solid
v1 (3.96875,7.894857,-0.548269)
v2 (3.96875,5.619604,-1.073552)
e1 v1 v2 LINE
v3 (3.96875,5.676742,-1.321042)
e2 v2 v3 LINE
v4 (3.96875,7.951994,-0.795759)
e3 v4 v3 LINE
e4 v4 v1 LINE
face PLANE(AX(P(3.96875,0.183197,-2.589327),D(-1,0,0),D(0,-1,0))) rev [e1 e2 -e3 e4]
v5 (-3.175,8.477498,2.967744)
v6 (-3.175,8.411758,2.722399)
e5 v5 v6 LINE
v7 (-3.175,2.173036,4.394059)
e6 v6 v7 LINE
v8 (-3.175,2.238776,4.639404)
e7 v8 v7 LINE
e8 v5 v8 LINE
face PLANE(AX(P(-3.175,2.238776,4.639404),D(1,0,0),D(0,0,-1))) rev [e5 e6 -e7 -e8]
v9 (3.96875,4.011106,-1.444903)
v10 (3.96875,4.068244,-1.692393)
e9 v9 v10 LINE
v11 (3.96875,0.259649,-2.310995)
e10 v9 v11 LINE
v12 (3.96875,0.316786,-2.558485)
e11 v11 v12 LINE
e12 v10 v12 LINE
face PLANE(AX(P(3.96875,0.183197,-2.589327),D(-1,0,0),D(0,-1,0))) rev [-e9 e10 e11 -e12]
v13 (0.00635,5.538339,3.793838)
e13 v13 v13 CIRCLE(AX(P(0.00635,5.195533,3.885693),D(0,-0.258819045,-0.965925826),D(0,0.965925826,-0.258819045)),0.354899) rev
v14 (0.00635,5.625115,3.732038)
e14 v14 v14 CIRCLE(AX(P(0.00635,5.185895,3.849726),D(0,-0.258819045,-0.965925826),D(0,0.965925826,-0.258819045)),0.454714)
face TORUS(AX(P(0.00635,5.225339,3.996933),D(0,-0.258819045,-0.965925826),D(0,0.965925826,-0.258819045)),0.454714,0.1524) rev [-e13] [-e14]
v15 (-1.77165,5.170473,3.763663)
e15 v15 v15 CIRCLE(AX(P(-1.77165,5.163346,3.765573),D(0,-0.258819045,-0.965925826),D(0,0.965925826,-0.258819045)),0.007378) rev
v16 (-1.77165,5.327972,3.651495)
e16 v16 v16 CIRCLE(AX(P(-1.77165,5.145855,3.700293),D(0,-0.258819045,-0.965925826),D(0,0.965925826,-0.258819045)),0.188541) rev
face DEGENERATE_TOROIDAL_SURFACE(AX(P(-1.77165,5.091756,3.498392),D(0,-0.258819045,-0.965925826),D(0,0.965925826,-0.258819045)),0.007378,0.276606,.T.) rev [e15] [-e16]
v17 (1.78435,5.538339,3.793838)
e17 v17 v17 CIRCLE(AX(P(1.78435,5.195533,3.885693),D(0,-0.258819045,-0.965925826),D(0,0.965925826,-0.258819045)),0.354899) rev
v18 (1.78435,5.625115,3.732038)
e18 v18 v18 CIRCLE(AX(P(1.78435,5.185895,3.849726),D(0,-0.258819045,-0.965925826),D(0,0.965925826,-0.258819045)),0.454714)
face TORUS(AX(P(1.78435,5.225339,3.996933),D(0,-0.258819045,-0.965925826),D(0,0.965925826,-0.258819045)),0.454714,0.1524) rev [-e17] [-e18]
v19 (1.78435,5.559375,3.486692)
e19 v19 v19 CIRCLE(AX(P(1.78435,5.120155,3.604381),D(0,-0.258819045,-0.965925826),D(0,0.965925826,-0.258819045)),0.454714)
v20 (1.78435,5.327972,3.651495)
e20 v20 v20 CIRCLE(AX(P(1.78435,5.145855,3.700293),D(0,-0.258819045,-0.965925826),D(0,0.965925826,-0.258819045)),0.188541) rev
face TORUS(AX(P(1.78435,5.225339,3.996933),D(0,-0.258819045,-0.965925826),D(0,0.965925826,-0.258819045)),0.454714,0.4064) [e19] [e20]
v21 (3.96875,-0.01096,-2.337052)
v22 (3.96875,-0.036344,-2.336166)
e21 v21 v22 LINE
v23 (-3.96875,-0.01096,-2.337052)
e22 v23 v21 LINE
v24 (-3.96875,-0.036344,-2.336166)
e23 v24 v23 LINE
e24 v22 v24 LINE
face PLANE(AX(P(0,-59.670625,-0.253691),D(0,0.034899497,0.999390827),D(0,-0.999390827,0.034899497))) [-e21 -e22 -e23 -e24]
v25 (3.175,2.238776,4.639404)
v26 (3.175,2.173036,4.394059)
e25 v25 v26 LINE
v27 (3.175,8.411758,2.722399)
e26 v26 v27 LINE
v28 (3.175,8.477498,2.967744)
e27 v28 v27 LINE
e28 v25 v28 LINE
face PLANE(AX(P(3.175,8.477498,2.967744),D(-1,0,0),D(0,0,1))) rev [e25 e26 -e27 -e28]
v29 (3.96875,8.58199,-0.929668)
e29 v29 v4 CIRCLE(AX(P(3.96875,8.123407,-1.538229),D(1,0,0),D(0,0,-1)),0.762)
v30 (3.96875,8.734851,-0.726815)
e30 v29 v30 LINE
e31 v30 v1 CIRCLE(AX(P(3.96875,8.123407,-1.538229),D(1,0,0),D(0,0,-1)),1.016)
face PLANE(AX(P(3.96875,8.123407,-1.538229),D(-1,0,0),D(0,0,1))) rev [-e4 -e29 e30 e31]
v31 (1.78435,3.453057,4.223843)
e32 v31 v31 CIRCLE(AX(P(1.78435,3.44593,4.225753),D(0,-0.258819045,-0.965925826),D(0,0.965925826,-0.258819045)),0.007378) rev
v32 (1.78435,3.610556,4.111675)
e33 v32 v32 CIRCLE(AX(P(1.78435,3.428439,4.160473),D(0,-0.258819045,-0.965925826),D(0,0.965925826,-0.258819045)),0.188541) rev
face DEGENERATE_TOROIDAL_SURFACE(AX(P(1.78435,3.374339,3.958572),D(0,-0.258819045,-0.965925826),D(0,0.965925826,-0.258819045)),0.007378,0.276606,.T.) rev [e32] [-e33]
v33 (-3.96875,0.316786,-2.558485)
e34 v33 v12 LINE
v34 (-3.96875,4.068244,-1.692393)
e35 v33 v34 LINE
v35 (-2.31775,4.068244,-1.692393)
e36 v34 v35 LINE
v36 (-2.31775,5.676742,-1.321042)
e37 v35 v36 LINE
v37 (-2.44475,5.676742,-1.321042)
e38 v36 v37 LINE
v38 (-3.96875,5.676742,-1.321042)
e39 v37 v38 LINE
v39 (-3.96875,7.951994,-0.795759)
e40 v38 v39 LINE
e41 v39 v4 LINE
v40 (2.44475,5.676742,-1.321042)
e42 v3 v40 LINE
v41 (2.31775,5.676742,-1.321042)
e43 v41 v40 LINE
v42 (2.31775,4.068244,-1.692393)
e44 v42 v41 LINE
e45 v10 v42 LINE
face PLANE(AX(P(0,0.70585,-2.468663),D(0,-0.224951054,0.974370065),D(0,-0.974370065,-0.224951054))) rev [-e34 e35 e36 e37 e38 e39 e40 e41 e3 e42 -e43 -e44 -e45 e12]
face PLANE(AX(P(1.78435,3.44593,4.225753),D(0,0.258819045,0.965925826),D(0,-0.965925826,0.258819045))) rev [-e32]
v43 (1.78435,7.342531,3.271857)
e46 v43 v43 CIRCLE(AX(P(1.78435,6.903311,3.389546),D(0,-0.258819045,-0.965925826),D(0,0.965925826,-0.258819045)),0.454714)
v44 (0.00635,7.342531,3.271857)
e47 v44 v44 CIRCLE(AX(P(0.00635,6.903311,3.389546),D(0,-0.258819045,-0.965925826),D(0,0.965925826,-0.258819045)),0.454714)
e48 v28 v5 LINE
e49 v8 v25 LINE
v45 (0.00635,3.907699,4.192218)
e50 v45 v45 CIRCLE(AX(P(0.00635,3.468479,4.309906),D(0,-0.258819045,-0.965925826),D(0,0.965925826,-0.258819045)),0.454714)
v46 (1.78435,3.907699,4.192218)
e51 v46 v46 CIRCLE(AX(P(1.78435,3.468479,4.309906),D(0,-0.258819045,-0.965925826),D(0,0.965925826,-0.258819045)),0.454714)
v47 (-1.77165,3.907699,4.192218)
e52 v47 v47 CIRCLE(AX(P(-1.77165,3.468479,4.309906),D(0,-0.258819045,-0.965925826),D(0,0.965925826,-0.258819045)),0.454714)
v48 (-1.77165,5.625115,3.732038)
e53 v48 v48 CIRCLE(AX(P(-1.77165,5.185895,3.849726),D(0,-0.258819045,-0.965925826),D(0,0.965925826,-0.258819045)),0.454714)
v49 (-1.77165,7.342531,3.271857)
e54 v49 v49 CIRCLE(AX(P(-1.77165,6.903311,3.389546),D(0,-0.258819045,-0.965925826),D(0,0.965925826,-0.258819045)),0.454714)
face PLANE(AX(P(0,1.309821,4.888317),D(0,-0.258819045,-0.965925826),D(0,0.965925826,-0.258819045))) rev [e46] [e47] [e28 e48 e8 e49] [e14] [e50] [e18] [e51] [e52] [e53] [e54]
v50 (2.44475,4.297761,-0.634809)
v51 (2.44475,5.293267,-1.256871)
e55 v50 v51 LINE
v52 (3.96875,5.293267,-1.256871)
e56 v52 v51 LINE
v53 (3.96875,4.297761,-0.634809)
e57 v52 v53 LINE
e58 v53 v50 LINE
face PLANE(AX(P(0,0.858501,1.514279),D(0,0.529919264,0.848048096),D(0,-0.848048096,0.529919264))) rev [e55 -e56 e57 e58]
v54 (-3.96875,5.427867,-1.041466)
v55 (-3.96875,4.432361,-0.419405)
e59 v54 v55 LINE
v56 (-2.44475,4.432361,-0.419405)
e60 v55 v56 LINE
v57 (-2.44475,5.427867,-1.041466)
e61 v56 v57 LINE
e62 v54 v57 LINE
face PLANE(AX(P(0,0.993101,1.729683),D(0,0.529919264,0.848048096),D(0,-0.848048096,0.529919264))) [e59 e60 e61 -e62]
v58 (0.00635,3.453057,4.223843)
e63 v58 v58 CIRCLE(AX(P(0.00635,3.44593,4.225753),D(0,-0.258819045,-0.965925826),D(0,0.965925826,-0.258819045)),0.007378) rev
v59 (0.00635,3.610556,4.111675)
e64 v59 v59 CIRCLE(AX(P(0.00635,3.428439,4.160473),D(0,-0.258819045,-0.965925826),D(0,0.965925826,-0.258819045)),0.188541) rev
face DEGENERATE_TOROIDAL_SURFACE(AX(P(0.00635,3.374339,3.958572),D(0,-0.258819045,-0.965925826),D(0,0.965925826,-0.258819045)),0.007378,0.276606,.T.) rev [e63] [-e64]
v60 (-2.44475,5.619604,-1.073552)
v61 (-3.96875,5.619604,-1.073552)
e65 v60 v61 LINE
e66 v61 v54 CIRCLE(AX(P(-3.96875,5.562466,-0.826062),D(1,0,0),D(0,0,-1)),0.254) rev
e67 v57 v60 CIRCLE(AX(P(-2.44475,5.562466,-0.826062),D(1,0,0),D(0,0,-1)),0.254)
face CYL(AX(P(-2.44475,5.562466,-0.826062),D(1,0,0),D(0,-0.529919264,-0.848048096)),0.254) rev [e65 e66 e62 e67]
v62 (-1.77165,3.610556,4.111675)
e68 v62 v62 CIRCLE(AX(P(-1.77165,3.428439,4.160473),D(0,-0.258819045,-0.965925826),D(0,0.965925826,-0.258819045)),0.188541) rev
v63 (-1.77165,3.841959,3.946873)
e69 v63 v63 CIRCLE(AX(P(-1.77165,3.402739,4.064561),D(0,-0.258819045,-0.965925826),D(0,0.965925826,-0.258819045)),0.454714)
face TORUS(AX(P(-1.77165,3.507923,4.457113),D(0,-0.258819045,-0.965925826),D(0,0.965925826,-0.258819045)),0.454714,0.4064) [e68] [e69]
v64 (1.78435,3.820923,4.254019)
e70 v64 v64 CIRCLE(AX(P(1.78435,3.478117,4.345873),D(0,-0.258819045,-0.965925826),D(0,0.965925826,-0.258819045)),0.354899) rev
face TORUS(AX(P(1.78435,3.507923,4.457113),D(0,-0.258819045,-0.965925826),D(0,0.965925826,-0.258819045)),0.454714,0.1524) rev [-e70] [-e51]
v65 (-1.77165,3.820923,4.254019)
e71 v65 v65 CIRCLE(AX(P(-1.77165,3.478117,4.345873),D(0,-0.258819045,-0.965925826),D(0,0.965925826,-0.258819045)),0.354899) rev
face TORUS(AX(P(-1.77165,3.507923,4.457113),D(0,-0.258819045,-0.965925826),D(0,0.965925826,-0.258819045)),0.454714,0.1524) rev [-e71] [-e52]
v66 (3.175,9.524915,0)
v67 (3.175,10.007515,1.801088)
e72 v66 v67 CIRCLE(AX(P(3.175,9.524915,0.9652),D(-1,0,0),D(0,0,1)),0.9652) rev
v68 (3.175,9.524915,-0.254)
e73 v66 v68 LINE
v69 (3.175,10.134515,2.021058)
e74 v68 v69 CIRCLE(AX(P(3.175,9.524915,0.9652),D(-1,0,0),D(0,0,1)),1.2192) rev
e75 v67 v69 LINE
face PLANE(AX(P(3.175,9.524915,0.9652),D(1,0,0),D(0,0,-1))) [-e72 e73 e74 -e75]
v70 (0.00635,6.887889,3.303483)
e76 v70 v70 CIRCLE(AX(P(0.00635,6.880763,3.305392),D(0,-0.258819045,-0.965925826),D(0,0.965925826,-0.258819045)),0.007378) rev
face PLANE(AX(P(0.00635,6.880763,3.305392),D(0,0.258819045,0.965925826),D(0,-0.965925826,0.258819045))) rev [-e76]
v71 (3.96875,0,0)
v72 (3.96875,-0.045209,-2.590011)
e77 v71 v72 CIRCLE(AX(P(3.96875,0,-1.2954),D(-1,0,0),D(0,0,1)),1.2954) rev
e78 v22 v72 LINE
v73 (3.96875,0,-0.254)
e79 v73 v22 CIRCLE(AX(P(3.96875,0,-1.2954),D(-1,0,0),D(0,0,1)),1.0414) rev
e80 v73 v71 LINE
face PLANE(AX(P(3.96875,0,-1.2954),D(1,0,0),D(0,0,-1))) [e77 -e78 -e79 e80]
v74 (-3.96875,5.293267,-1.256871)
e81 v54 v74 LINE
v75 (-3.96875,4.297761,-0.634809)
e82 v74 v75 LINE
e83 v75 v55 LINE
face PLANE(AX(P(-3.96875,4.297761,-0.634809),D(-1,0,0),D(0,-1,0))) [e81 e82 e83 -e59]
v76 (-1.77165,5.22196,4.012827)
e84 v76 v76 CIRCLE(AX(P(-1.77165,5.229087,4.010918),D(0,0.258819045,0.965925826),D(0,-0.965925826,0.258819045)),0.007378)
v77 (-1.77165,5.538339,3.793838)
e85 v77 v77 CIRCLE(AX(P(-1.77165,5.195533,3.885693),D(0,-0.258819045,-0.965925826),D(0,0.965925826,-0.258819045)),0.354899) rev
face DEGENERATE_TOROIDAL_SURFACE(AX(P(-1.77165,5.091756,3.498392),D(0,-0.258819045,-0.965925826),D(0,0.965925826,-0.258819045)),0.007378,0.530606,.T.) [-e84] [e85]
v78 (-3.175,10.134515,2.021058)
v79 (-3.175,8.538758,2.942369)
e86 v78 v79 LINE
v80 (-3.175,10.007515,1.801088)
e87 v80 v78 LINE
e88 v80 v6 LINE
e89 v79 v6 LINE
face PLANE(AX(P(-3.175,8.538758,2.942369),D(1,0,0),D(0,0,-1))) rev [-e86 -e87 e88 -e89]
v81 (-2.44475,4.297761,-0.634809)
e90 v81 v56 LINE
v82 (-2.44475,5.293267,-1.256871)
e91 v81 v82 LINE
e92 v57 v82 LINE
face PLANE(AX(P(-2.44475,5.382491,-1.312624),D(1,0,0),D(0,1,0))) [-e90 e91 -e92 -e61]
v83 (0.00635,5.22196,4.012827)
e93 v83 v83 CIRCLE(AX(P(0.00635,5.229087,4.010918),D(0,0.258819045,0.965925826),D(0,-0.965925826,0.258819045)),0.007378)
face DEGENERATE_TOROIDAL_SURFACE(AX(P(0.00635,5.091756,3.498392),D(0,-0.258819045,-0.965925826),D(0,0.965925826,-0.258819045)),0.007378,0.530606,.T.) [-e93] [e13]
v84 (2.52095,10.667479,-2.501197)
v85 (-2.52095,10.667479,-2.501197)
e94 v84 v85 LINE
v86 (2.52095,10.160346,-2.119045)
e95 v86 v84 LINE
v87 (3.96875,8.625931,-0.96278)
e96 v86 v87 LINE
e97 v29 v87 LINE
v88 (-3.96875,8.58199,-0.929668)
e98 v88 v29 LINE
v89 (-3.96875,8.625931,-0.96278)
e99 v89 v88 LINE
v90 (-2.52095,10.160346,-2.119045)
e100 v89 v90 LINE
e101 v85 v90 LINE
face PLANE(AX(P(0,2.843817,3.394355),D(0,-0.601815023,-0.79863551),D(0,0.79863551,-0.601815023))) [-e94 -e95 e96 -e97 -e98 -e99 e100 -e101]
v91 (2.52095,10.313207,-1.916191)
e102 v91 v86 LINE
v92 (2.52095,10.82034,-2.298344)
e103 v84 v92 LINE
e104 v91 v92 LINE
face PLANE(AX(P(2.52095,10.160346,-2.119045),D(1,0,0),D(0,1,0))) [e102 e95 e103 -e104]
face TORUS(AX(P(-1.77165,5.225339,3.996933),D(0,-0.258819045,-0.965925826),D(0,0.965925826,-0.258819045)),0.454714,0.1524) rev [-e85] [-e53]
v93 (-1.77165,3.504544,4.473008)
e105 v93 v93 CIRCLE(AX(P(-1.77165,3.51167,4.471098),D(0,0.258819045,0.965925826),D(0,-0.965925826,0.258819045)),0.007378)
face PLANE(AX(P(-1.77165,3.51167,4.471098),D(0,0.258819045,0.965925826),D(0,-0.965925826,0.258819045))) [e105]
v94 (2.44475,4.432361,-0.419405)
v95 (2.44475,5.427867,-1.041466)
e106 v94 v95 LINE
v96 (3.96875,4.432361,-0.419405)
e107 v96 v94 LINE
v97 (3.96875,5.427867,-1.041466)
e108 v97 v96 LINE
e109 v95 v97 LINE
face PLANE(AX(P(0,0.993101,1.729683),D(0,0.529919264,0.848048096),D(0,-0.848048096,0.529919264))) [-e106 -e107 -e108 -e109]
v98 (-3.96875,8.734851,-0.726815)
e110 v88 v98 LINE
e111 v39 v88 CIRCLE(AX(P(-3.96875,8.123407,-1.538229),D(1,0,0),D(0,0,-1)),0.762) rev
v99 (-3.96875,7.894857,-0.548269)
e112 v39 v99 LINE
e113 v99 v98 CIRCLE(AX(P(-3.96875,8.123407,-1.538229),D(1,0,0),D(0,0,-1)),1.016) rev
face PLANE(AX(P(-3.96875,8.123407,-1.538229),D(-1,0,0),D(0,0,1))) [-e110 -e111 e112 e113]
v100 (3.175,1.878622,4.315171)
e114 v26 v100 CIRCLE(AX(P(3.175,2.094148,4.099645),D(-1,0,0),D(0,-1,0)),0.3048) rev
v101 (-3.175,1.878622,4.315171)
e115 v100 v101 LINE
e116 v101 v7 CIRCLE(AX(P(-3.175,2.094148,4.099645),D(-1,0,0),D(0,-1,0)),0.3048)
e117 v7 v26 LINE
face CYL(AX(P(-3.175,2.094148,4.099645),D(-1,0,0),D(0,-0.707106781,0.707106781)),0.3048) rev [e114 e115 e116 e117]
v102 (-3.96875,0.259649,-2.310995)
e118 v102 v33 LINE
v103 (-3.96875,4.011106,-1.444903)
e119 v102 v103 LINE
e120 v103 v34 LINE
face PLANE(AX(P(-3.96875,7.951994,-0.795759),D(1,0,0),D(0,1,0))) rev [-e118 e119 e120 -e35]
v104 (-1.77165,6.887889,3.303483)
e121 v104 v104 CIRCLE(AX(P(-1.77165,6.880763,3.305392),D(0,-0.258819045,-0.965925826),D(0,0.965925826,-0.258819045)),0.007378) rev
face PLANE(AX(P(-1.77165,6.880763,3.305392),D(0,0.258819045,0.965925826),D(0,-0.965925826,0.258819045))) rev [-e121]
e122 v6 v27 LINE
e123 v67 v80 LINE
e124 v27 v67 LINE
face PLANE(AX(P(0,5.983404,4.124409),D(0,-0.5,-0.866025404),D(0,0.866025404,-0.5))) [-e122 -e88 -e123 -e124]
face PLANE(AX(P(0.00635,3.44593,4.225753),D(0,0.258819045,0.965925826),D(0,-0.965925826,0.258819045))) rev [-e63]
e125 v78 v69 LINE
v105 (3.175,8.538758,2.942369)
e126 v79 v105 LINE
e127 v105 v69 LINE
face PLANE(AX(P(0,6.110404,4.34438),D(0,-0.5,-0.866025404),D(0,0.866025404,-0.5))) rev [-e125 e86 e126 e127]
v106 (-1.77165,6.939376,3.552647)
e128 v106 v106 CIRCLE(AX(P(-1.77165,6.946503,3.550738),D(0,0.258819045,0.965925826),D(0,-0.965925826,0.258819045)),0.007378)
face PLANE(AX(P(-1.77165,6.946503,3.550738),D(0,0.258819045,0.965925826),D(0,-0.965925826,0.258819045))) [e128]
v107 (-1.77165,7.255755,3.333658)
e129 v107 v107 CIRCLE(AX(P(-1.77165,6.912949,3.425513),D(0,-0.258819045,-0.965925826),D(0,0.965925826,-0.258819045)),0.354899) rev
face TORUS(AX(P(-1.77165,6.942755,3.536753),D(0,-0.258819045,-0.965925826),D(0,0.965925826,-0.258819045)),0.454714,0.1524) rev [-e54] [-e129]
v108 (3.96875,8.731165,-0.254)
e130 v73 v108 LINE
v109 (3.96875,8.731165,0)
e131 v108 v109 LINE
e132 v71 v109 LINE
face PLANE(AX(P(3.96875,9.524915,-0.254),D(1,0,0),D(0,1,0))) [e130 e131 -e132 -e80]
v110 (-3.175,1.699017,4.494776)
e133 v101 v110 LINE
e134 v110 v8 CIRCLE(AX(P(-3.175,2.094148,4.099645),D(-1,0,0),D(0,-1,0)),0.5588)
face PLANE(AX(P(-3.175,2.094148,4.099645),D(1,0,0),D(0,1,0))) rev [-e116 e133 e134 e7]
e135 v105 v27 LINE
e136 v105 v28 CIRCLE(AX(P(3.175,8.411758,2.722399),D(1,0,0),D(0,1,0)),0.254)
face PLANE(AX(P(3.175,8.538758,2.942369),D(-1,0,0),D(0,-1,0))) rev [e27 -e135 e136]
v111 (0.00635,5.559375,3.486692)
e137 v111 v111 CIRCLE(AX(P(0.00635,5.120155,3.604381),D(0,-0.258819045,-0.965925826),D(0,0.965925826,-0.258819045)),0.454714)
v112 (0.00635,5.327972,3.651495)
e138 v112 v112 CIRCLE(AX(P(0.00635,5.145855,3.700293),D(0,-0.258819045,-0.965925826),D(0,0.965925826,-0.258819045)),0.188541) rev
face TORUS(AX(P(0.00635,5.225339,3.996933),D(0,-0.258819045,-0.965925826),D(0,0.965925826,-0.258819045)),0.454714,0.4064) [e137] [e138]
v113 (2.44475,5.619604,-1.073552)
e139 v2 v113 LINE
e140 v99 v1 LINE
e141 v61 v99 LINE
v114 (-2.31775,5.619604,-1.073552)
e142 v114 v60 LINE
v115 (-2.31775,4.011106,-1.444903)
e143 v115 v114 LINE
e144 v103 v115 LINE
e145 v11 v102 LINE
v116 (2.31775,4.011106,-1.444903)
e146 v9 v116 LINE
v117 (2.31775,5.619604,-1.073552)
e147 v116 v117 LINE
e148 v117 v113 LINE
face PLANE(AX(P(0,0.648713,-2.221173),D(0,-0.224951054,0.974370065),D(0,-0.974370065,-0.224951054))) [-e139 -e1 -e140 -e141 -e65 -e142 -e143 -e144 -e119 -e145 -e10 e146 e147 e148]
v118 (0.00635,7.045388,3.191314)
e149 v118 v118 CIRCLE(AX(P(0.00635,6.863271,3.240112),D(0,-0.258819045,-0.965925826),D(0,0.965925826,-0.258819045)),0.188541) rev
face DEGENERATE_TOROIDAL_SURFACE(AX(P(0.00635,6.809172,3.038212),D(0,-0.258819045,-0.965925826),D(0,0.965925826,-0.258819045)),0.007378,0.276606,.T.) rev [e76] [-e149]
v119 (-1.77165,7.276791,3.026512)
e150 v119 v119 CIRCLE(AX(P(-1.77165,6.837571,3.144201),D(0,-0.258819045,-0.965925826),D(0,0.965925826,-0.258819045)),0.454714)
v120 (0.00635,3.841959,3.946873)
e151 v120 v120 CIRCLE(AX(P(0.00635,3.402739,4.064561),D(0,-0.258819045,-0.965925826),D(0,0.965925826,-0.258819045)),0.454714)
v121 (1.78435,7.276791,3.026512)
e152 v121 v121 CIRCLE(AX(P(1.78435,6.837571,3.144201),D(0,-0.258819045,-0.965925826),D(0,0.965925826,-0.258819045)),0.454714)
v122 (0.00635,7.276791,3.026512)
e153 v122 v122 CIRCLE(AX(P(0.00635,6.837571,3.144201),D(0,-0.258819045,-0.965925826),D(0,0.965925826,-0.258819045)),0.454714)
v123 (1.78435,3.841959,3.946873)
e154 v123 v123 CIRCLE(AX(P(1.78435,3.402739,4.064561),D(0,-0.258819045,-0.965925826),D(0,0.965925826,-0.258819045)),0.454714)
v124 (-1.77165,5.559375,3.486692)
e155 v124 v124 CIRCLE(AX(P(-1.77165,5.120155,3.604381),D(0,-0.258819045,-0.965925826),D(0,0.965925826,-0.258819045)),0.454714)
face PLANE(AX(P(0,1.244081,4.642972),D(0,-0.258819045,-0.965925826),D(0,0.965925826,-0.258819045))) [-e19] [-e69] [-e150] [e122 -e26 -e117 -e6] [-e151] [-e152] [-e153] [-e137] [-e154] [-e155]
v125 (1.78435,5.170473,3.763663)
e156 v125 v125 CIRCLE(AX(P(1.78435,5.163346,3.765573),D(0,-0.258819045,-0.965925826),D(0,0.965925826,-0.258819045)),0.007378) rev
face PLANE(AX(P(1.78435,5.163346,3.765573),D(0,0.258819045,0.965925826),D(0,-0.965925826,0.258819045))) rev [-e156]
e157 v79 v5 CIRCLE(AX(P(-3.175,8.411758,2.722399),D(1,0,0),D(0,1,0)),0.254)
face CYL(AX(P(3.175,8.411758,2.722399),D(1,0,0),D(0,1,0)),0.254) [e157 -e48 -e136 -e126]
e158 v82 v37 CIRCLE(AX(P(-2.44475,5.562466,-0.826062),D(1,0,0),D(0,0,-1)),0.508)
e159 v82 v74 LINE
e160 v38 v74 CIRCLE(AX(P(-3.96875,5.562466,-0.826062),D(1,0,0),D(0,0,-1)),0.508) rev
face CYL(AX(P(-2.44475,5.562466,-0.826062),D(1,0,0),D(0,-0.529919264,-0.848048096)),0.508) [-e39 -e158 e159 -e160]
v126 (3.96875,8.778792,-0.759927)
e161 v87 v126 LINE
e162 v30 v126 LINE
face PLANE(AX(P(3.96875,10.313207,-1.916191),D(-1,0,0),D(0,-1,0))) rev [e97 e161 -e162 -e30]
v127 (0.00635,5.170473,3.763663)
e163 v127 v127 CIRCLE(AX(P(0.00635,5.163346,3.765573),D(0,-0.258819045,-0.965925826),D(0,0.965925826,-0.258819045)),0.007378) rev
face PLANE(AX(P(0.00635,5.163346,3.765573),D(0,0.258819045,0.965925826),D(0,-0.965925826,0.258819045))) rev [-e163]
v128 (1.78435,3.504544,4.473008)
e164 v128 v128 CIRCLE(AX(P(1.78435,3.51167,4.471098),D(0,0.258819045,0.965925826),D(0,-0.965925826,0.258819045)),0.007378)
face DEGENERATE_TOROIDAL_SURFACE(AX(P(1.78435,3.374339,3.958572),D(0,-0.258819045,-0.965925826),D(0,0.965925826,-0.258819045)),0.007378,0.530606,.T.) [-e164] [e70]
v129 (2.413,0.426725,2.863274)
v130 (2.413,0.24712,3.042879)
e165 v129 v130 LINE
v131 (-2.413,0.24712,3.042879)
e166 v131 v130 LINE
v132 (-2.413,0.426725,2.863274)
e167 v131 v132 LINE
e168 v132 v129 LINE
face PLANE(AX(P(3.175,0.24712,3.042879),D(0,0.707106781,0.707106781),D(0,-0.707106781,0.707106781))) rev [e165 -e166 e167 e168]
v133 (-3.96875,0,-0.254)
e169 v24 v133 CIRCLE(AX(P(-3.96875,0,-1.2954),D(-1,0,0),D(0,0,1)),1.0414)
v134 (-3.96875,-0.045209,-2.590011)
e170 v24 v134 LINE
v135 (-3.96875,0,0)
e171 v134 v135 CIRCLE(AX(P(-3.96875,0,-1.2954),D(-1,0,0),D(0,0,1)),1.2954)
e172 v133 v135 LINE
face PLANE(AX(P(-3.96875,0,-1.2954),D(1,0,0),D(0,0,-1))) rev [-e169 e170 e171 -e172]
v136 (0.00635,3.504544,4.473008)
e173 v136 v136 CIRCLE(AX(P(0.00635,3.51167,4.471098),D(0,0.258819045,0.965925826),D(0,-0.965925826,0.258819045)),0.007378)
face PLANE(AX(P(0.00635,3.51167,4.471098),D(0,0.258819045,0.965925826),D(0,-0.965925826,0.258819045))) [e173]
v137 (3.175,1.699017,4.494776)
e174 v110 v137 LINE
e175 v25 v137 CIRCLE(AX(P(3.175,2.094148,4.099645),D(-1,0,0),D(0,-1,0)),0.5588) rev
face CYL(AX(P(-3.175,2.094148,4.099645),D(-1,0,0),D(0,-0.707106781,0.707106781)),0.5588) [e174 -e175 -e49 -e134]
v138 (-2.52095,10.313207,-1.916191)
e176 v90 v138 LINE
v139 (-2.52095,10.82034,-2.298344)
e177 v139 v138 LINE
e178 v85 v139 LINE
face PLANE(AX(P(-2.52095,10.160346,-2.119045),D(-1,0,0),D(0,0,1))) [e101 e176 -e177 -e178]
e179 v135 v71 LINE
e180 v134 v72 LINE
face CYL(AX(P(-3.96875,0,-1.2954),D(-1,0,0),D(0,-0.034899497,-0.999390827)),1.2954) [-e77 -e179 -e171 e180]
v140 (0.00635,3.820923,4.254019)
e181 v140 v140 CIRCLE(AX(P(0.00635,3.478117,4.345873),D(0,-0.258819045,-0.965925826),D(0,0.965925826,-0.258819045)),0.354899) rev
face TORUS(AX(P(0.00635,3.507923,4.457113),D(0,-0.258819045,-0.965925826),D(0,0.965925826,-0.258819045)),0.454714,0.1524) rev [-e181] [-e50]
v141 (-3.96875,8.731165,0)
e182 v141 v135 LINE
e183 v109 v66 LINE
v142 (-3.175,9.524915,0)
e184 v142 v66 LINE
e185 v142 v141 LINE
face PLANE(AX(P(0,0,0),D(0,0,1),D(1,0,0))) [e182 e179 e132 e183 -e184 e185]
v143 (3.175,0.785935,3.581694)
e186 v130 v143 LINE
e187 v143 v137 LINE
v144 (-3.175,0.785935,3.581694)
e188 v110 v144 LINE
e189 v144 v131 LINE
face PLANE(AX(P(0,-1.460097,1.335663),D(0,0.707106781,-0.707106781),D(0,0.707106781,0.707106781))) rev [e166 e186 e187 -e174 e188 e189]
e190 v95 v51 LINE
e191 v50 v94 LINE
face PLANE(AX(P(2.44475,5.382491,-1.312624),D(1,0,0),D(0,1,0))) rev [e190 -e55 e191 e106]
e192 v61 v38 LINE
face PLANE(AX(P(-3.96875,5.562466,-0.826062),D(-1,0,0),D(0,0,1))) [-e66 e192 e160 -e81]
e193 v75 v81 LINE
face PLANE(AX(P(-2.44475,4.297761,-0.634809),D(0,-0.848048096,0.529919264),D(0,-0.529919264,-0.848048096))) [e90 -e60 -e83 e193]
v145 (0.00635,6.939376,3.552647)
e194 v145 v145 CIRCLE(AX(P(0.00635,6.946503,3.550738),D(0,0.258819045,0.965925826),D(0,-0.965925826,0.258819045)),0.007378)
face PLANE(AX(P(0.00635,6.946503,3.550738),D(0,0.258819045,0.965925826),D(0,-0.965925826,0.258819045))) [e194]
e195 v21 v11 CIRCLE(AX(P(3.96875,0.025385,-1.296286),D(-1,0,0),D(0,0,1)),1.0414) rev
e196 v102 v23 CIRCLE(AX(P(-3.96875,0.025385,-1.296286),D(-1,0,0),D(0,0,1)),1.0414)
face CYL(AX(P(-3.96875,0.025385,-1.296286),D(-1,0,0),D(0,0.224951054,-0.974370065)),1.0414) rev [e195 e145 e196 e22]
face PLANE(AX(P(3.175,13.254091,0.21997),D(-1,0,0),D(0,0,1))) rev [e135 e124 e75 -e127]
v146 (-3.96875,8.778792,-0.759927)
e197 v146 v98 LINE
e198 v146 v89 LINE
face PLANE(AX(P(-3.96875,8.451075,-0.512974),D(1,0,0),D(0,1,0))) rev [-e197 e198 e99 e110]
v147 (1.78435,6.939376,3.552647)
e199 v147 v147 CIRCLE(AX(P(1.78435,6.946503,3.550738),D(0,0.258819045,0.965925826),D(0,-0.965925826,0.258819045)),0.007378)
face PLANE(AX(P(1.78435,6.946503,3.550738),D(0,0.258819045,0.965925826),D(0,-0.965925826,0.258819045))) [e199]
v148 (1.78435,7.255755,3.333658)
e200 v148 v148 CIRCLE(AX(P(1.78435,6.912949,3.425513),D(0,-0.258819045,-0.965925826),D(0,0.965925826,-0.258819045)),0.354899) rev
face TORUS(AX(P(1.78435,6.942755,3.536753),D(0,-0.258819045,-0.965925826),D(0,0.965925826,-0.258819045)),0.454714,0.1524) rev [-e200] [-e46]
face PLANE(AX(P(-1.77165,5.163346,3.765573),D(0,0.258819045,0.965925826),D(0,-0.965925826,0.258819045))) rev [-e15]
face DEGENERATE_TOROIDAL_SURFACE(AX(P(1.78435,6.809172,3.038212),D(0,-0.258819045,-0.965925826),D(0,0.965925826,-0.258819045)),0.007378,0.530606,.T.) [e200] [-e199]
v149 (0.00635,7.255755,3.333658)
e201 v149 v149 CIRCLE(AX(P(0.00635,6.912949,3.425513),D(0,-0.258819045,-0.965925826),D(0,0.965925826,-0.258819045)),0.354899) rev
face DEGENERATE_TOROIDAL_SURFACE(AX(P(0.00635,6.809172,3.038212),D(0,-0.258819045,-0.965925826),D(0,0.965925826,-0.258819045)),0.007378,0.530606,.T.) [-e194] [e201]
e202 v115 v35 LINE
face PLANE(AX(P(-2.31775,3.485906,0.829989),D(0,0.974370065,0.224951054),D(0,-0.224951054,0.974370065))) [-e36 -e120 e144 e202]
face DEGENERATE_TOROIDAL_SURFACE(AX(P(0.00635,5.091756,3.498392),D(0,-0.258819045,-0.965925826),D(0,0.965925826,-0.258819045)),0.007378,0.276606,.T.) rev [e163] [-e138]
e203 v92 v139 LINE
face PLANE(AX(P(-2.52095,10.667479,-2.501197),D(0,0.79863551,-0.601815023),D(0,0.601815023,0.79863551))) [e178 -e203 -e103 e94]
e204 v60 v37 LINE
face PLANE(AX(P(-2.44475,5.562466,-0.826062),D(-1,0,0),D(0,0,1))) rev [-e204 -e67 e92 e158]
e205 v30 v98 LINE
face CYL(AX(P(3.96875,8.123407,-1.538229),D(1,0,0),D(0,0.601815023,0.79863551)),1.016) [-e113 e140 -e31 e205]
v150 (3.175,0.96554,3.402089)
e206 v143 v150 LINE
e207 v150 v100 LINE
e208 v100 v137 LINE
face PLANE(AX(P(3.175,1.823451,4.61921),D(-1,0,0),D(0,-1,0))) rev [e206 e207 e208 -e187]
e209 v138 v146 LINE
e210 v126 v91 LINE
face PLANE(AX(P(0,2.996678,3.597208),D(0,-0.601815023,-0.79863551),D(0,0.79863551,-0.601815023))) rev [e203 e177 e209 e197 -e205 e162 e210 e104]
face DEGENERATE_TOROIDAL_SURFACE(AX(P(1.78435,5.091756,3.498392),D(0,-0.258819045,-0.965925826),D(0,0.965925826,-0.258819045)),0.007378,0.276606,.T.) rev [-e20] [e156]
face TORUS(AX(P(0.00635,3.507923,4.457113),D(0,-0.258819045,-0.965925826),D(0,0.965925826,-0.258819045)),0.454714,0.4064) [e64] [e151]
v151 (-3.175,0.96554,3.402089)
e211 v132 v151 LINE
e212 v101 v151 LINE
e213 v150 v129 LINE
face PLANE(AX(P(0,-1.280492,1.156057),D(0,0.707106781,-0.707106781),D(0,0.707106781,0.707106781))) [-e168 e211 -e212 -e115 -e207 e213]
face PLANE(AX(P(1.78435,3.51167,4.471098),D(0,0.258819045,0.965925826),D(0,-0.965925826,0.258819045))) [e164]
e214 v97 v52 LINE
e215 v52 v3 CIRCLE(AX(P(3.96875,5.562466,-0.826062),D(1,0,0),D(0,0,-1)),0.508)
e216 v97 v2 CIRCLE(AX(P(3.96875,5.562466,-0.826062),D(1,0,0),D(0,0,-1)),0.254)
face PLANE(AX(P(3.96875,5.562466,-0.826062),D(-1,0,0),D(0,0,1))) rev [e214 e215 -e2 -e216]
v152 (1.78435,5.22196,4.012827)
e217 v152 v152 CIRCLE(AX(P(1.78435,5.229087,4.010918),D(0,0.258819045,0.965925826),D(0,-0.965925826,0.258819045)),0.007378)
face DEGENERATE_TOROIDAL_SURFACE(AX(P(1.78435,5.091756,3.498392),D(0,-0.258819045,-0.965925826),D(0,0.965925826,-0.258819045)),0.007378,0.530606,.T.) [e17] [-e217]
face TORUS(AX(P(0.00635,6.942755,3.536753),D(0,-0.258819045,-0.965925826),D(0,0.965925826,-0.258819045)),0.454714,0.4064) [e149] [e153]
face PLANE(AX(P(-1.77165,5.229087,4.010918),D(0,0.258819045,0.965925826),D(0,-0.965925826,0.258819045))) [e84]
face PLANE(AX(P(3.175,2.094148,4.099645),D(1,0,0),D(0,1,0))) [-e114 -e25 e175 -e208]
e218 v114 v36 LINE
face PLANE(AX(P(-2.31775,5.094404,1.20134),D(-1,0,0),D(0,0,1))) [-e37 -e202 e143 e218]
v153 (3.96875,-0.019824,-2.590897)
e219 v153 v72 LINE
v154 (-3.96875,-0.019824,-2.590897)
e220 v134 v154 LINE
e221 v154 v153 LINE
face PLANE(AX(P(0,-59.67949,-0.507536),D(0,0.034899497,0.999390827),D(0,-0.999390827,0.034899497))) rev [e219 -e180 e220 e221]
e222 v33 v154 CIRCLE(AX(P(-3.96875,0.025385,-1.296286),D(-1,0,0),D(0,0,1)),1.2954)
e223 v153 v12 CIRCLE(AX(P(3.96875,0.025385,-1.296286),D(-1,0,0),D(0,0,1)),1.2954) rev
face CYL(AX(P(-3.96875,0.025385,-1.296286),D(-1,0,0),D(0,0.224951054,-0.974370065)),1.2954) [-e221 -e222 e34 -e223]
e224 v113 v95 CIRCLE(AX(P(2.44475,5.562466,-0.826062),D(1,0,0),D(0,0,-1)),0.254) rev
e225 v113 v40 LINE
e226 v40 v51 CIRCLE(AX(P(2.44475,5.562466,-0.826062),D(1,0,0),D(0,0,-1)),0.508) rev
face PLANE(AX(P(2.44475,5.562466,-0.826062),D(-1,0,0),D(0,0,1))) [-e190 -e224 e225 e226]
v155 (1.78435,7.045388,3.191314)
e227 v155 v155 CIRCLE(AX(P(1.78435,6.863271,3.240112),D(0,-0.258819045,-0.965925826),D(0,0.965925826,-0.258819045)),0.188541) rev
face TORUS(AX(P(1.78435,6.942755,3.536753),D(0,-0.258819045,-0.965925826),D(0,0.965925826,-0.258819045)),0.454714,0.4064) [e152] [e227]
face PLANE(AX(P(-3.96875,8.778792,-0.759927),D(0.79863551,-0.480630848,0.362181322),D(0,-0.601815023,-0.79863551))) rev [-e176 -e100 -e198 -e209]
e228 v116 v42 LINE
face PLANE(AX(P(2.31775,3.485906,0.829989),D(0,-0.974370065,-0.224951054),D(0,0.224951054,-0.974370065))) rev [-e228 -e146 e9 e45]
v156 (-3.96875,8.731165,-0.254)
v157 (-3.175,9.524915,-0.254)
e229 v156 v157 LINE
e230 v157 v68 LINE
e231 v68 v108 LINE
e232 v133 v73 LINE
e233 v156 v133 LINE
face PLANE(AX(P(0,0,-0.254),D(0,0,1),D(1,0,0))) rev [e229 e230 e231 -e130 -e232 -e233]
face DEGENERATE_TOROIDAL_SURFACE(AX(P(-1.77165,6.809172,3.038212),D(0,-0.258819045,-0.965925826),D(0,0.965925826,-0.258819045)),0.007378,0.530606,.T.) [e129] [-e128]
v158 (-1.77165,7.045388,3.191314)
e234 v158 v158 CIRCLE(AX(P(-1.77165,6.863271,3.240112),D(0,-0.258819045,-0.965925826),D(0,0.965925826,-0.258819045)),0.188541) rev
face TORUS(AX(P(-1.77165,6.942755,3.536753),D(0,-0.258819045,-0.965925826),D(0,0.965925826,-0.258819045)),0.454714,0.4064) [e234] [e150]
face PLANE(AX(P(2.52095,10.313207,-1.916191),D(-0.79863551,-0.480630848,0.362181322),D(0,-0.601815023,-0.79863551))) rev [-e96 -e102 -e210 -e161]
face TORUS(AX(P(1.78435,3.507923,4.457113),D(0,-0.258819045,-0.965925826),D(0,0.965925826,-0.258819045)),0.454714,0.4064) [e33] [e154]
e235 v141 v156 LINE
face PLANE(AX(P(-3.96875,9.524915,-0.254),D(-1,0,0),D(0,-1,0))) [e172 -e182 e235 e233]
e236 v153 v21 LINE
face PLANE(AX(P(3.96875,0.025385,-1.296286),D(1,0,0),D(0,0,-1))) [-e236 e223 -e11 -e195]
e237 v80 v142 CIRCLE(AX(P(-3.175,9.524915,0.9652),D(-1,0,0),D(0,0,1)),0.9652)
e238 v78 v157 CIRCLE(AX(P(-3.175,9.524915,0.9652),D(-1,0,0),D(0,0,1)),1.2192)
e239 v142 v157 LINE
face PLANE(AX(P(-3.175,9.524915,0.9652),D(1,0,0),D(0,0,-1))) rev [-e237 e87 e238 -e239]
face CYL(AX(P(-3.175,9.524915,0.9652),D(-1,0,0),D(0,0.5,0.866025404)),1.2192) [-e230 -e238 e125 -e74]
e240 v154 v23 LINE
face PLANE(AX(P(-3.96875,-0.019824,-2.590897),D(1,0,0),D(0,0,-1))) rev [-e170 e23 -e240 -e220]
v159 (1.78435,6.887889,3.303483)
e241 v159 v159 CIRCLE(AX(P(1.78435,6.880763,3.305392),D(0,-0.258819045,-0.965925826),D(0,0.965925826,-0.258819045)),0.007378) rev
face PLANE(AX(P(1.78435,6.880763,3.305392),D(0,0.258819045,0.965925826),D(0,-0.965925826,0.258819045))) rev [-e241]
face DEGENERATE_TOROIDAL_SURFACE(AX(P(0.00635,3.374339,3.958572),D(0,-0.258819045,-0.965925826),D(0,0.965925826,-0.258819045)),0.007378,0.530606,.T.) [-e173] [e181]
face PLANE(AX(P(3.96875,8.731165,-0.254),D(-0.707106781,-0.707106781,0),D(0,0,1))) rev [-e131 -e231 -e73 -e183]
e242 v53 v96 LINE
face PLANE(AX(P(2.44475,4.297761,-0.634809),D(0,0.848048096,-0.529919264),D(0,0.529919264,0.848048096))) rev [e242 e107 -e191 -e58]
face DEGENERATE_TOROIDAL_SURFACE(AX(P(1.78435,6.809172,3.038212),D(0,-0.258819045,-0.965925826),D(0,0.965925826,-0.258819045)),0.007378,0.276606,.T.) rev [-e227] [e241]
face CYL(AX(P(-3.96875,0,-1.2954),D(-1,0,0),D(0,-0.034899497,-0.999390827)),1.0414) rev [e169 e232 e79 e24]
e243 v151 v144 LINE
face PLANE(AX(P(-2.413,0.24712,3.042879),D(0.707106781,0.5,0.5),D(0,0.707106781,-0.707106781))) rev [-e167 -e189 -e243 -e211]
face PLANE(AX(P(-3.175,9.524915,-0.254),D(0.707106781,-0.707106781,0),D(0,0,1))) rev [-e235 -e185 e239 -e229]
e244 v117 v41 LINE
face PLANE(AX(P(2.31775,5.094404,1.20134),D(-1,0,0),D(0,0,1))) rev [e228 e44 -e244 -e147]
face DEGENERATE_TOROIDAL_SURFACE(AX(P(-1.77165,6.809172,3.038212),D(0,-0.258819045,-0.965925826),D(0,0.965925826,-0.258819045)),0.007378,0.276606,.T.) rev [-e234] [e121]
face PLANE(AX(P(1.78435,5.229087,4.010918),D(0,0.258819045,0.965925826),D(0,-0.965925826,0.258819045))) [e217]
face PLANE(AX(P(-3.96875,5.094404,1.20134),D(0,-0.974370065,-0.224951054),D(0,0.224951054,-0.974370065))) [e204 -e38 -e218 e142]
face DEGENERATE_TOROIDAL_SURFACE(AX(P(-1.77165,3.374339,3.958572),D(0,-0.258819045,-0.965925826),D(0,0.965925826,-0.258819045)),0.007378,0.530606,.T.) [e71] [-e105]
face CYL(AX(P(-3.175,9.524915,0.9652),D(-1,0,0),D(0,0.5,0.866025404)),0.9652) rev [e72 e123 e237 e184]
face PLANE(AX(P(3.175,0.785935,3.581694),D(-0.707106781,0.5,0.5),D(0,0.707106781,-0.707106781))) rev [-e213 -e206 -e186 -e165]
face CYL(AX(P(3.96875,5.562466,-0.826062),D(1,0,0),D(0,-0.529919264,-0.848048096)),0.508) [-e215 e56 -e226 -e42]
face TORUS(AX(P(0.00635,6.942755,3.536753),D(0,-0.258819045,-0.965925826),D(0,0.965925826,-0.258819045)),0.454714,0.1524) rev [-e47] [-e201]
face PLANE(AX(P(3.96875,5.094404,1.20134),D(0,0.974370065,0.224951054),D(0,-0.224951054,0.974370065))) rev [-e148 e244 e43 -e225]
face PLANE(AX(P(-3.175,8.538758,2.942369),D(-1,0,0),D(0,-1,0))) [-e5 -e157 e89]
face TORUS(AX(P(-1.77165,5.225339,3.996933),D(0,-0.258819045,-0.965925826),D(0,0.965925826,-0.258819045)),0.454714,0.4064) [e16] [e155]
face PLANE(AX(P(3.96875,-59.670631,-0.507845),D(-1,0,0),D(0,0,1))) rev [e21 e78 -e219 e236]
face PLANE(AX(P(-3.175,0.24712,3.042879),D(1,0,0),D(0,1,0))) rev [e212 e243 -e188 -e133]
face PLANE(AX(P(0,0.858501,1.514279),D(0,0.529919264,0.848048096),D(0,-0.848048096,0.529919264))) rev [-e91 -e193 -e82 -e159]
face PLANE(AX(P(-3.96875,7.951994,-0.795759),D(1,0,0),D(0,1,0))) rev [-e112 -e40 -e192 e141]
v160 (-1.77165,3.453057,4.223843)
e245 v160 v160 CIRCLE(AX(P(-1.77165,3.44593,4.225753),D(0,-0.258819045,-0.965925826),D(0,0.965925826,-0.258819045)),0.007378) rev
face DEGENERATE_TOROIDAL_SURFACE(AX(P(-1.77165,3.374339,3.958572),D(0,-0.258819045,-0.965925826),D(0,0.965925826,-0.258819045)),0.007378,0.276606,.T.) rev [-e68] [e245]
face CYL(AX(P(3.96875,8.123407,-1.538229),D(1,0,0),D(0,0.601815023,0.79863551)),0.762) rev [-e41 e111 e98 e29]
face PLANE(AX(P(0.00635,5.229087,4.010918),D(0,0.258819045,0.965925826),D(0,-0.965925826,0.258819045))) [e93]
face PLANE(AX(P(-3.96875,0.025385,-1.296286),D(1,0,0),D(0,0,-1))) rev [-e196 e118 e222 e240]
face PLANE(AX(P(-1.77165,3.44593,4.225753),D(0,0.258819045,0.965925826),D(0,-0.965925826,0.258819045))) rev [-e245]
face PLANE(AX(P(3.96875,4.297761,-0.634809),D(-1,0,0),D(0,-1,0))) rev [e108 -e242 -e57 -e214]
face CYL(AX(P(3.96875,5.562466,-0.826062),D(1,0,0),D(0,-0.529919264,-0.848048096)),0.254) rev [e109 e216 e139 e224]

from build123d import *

# Parameters (mm, degrees)
SKETCH7_W              = 7.9375
SKETCH7_H              = 9.524915418
BASE_FLANGE1_DEPTH     = 0.254
EDGE_FLANGE1_DEPTH     = 6.35
CHAMFER1_SIZE          = 0.79375
EDGE_FLANGE2_START     = -3.175
EDGE_FLANGE2_DEPTH     = 6.35
EDGE_FLANGE3_DEPTH     = 6.35
CHAMFER2_SIZE          = 0.762
EDGE_FLANGE4_DEPTH     = 7.9375
EDGE_FLANGE5_DEPTH     = 7.9375
EDGE_FLANGE6_START     = -3.96875
EDGE_FLANGE6_DEPTH     = 7.9375
CHAMFER3_SIZE          = 1.4478
CHAMFER3_SIZE2         = 1.921295493
SKETCH30_W             = 5.0419
SKETCH30_H             = 0.635
TAB1_DEPTH             = 0.254
SKETCH33_W             = 1.651
SKETCH33_H             = 1.650807976
CUT_EXTRUDE1_DEPTH     = 0.254
EDGE_FLANGE7_DEPTH     = 1.524
SKETCH37_R             = 0.3937
BOSS_EXTRUDE1_DEPTH    = 0.166878
FILLET1_R              = 0.530606
FILLET2_R              = 0.1524
LPATTERN1_COUNT        = 3
LPATTERN1_PITCH        = 1.778
LPATTERN1_COUNT_DIR2   = 3
LPATTERN1_PITCH_DIR2   = 1.778
FILLET1_OF_LPATTERN1_R = 0.530606
FILLET2_OF_LPATTERN1_R = 0.1524


# Read off the part's stored shape, not the designer's step: Edge-Flange2, Edge-Flange6, SurfaceCut1
# Sheet-metal steps are written as plain solids
# Some blends are built 0.0001 mm under size
with BuildPart() as part:
    # Sketch7 → Base-Flange1 (new body)
    with BuildSketch(Plane.XY):
        with Locations((0, 4.762457709)):
            Rectangle(SKETCH7_W, SKETCH7_H)
    extrude(amount=-BASE_FLANGE1_DEPTH)

    # Edge-Flange1 section (across the edge) → Edge-Flange1 (add)
    with BuildSketch(Plane(origin=(3.175, 13.127090857, 0), x_dir=(0, -0.500000000000001, -0.866025403784438), z_dir=(-1, 0, 0))):
        with BuildLine():
            Line((-0.254, 3.602175439), (-0.254, 5.444797135))
            Line((-0.254, 5.444797135), (0, 5.444797135))
            Line((0, 5.444797135), (0, 3.602175439))
            ThreePointArc((0, 3.602175439), (0.715387858, 2.669863832), (1.80108772, 3.119575439))
            Line((1.80108772, 3.119575439), (2.021058172, 2.992575439))
            ThreePointArc((2.021058172, 2.992575439), (0.64964782, 2.424518672), (-0.254, 3.602175439))
        make_face()
    extrude(amount=EDGE_FLANGE1_DEPTH)

    # Chamfer1
    chamfer1_edges = [part.edges().sort_by_distance(p)[0] for p in [
        (-3.96875, 9.524915418, -0.127),
        (3.96875, 9.524915418, -0.127),
    ]]
    chamfer(chamfer1_edges, length=CHAMFER1_SIZE - 0.0001)  # a hair under: the kernel refuses the full size

    # Edge-Flange2 outline → Edge-Flange2 (add)
    with BuildSketch(Plane.YZ.offset(EDGE_FLANGE2_START)):
        with BuildLine():
            Line((8.41175822, 2.722398567), (8.53875822, 2.94236902))
            ThreePointArc((8.53875822, 2.94236902), (8.508959812, 2.957063969), (8.477498258, 2.967743727))
            Line((8.477498258, 2.967743727), (2.238776274, 4.639404245))
            Line((2.238776274, 4.639404245), (2.173036237, 4.394059085))
            Line((2.173036237, 4.394059085), (8.41175822, 2.722398567))
        make_face()
    extrude(amount=EDGE_FLANGE2_DEPTH)

    # Edge-Flange3 section (across the edge) → Edge-Flange3 (add)
    with BuildSketch(Plane(origin=(3.175, 2.003056124, 4.439605119), x_dir=(0, 0.7071067811865389, -0.7071067811865563), z_dir=(-1, 0, 0))):
        with BuildLine():
            Line((-0.254, 0.175976362), (-0.254, 2.229269032))
            Line((-0.254, 2.229269032), (0, 2.229269032))
            Line((0, 2.229269032), (0, 0.175976362))
            ThreePointArc((0, 0.175976362), (0.040835457, 0.023576362), (0.1524, -0.087988181))
            Line((0.1524, -0.087988181), (0.0254, -0.307958634))
            ThreePointArc((0.0254, -0.307958634), (-0.179134996, -0.103423638), (-0.254, 0.175976362))
        make_face()
    extrude(amount=EDGE_FLANGE3_DEPTH)

    # Chamfer2
    chamfer2_edges = [part.edges().sort_by_distance(p)[0] for p in [
        (3.175, 0.336922313, 2.953076431),
        (-3.175, 0.336922313, 2.953076431),
    ]]
    chamfer(chamfer2_edges, length=CHAMFER2_SIZE)

    # Edge-Flange4 section (across the edge) → Edge-Flange4 (add)
    with BuildSketch(Plane(origin=(3.96875, -59.661766042, -0.254), x_dir=(0, 0.03489949670250102, 0.9993908270190958), z_dir=(-1, 0, 0))):
        with BuildLine():
            Line((-0.254, 59.661766042), (-0.254, 59.687166042))
            Line((-0.254, 59.687166042), (0, 59.687166042))
            Line((0, 59.687166042), (0, 59.661766042))
            ThreePointArc((0, 59.661766042), (1.023225064, 58.620524653), (2.082165607, 59.625421706))
            Line((2.082165607, 59.625421706), (2.336010877, 59.616557234))
            ThreePointArc((2.336010877, 59.616557234), (1.018792153, 58.366563338), (-0.254, 59.661766042))
        make_face()
    extrude(amount=EDGE_FLANGE4_DEPTH)

    # Edge-Flange5 section (across the edge) → Edge-Flange5 (add)
    with BuildSketch(Plane(origin=(3.96875, 0.126059583, -2.341836877), x_dir=(0, -0.2249510543438583, 0.9743700647852369), z_dir=(-1, 0, 0))):
        with BuildLine():
            Line((-0.254, 0.137102911), (-0.254, 7.973148266))
            Line((-0.254, 7.973148266), (0, 7.973148266))
            Line((0, 7.973148266), (0, 0.137102911))
            ThreePointArc((0, 0.137102911), (0.008909321, 0.001172934), (0.035484845, -0.132431243))
            Line((0.035484845, -0.132431243), (-0.209860315, -0.19817128))
            ThreePointArc((-0.209860315, -0.19817128), (-0.242917673, -0.031980718), (-0.254, 0.137102911))
        make_face()
    extrude(amount=EDGE_FLANGE5_DEPTH)

    # Edge-Flange6 outline → Edge-Flange6 (add)
    with BuildSketch(Plane.YZ.offset(EDGE_FLANGE6_START)):
        with BuildLine():
            Line((10.313206583, -1.916191386), (8.73485091, -0.726815076))
            ThreePointArc((8.73485091, -0.726815076), (8.334645124, -0.544430792), (7.894856575, -0.548268768))
            Line((7.894856575, -0.548268768), (7.951994143, -0.795758765))
            ThreePointArc((7.951994143, -0.795758765), (8.281835555, -0.792880282), (8.581989894, -0.929668495))
            Line((8.581989894, -0.929668495), (10.160345567, -2.119044805))
            Line((10.160345567, -2.119044805), (10.313206583, -1.916191386))
        make_face()
    extrude(amount=EDGE_FLANGE6_DEPTH)

    # Chamfer3
    chamfer3_edges = [part.edges().sort_by_distance(p)[0] for p in [
        (-3.96875, 10.236776075, -2.017618096),
        (3.96875, 10.236776075, -2.017618096),
    ]]
    chamfer3_side = [part.faces().sort_by_distance(p)[0] for p in [
        (0, 10.236776075, -2.017618096),
    ]]
    chamfer(chamfer3_edges, length=CHAMFER3_SIZE, length2=CHAMFER3_SIZE2, reference=chamfer3_side[0])

    # Sketch30 → Tab1 (add)
    with BuildSketch(Plane(origin=(0, 2.814270104, 3.734662569), x_dir=(1, 0, 0), z_dir=(0, 0.6018150231520505, 0.7986355100472912))):
        with Locations((0, 9.707185762)):
            Rectangle(SKETCH30_W, SKETCH30_H)
    extrude(amount=-TAB1_DEPTH)

    # Sketch33 → Cut-Extrude1 (cut)
    with BuildSketch(Plane(origin=(0, 0.576813417, -2.498453398), x_dir=(-1, 0, 0), z_dir=(0, 0.2249510543438583, -0.9743700647852369))):
        with Locations((-3.14325, 4.408673174)):
            Rectangle(SKETCH33_W, SKETCH33_H)
    cut_extrude1 = extrude(amount=-CUT_EXTRUDE1_DEPTH, mode=Mode.SUBTRACT)

    # Edge-Flange7 section (across the edge) → Edge-Flange7 (add)
    with BuildSketch(Plane(origin=(2.44475, 5.517090239, -1.097219381), x_dir=(-1.6147430075010574e-15, 0.5299192642332057, 0.8480480961564255), z_dir=(1, 0, 0))):
        with BuildLine():
            Line((-0.254, 0.105210245), (-0.254, 1.279089755))
            Line((-0.254, 1.279089755), (0, 1.279089755))
            Line((0, 1.279089755), (0, 0.105210245))
            ThreePointArc((0, 0.105210245), (0.019334599, 0.008008653), (0.074394878, -0.074394878))
            Line((0.074394878, -0.074394878), (-0.105210245, -0.254))
            ThreePointArc((-0.105210245, -0.254), (-0.215330803, -0.089192939), (-0.254, 0.105210245))
        make_face()
    edge_flange7 = extrude(amount=EDGE_FLANGE7_DEPTH)

    # Mirror1: Cut-Extrude1, Edge-Flange7 across plane
    add(cut_extrude1.mirror(Plane(origin=(0, 0, 0), x_dir=(0, 0, 1), z_dir=(1, 0, 0))), mode=Mode.SUBTRACT)
    add(edge_flange7.mirror(Plane(origin=(0, 0, 0), x_dir=(0, 0, 1), z_dir=(1, 0, 0))))

    # Sketch37 → Boss-Extrude1 (add)
    with BuildSketch(Plane(origin=(0, 1.309820635, 4.888317158), x_dir=(1, 0, 0), z_dir=(0, 0.2588190451025286, 0.9659258262890663))):
        with Locations(Location((-1.77165, 5.790807795, 0), (0, 0, 90))):
            Circle(SKETCH37_R)
    boss_extrude1 = extrude(amount=BOSS_EXTRUDE1_DEPTH)

    # Fillet1
    # the kernel refuses this fillet: 0.530606 mm, written as the material it takes off along each edge
    with BuildSketch(Plane(origin=(-1.77165, 6.946502644, 3.550737584), x_dir=(0, 0.9659258262890662, -0.2588190451025287), z_dir=(1, 0, 0))) as fillet1_piece_1:
        with BuildLine():
            CenterArc((0.007378024, -0.530606), FILLET1_R, 43.274584136, 46.725415864)
            Line((0.007378024, 0), (0.007378024, 0.01061212))
            Line((0.007378024, 0.01061212), (0.3937, 0.01061212))
            Line((0.3937, 0.01061212), (0.40431212, 0))
            ThreePointArc((0.40431212, 0), (0.40431212, -0.083439), (0.40142644, -0.15960344))
            Line((0.40142644, -0.15960344), (0.3937, -0.166878))
        make_face()
    revolve(axis=Axis((-1.77165, 6.946502644, 3.550737584), (0, 0.2588190451025286, 0.9659258262890663)), mode=Mode.SUBTRACT)

    # Fillet2
    fillet2_edges = [part.edges().sort_by_distance(p)[0] for p in [
        (-1.77165, 6.523026441, 3.491442872),
    ]]
    fillet(fillet2_edges, radius=FILLET2_R)

    # SurfaceCut1 outline → SurfaceCut1 (revolve, cut)
    with BuildSketch(Plane(origin=(-1.77165, 5.593490804, -1.498771344), x_dir=(1, 0, 0), z_dir=(0, -0.9659258262890661, 0.25881904510252907))):
        with BuildLine():
            Line((0, 4.806758316), (0.454713562, 4.806758316))
            ThreePointArc((0.454713562, 4.806758316), (0.312668551, 4.832390441), (0.188541431, 4.906053519))
            ThreePointArc((0.188541431, 4.906053519), (0.10405741, 4.956190451), (0.007378024, 4.973636316))
            Line((0.007378024, 4.973636316), (0, 4.973636316))
            Line((0, 4.973636316), (0, 4.806758316))
        make_face()
    surfacecut1 = revolve(axis=Axis((-1.77165, 5.593490804, -1.498771344), (0, 0.25881904510252907, 0.9659258262890661)), mode=Mode.SUBTRACT)

    # LPattern1: Boss-Extrude1, SurfaceCut1 3 × 3
    with Locations(*[Vector(1, 0, 0) * (i * LPATTERN1_PITCH) + Vector(0, -0.9659258262890662, 0.25881904510252857) * (j * LPATTERN1_PITCH_DIR2) for i in range(LPATTERN1_COUNT) for j in range(LPATTERN1_COUNT_DIR2) if (i, j) != (0, 0)]):
        add(boss_extrude1)
        add(surfacecut1, mode=Mode.SUBTRACT)

    # Fillet1 of LPattern1
    # the kernel refuses this fillet: 0.530606 mm, written as the material it takes off along each edge
    with BuildSketch(Plane(origin=(-1.77165, 5.229086525, 4.010917846), x_dir=(0, 0.9659258262890665, -0.25881904510252707), z_dir=(1, 0, 0))) as fillet1_of_lpattern1_piece_1:
        with BuildLine():
            CenterArc((0.007378024, -0.530606), FILLET1_OF_LPATTERN1_R, 43.274584136, 46.725415864)
            Line((0.007378024, 0), (0.007378024, 0.01061212))
            Line((0.007378024, 0.01061212), (0.3937, 0.01061212))
            Line((0.3937, 0.01061212), (0.40431212, 0))
            ThreePointArc((0.40431212, 0), (0.40431212, -0.083439), (0.40142644, -0.15960344))
            Line((0.40142644, -0.15960344), (0.3937, -0.166878))
        make_face()
    revolve(axis=Axis((-1.77165, 5.229086525, 4.010917846), (0, 0.2588190451025286, 0.9659258262890663)), mode=Mode.SUBTRACT)
    with BuildSketch(Plane(origin=(-1.77165, 3.511670405, 4.471098109), x_dir=(0, 0.9659258262890665, -0.2588190451025276), z_dir=(1, 0, 0))) as fillet1_of_lpattern1_piece_2:
        with BuildLine():
            CenterArc((0.007378024, -0.530606), FILLET1_OF_LPATTERN1_R, 43.274584136, 46.725415864)
            Line((0.007378024, 0), (0.007378024, 0.01061212))
            Line((0.007378024, 0.01061212), (0.3937, 0.01061212))
            Line((0.3937, 0.01061212), (0.40431212, 0))
            ThreePointArc((0.40431212, 0), (0.40431212, -0.083439), (0.40142644, -0.15960344))
            Line((0.40142644, -0.15960344), (0.3937, -0.166878))
        make_face()
    revolve(axis=Axis((-1.77165, 3.511670405, 4.471098109), (0, 0.2588190451025286, 0.9659258262890663)), mode=Mode.SUBTRACT)
    with BuildSketch(Plane(origin=(0.00635, 6.946502644, 3.550737584), x_dir=(0, 0.9659258262890662, -0.2588190451025287), z_dir=(1, 0, 0))) as fillet1_of_lpattern1_piece_3:
        with BuildLine():
            CenterArc((0.007378024, -0.530606), FILLET1_OF_LPATTERN1_R, 43.274584136, 46.725415864)
            Line((0.007378024, 0), (0.007378024, 0.01061212))
            Line((0.007378024, 0.01061212), (0.3937, 0.01061212))
            Line((0.3937, 0.01061212), (0.40431212, 0))
            ThreePointArc((0.40431212, 0), (0.40431212, -0.083439), (0.40142644, -0.15960344))
            Line((0.40142644, -0.15960344), (0.3937, -0.166878))
        make_face()
    revolve(axis=Axis((0.00635, 6.946502644, 3.550737584), (0, 0.2588190451025286, 0.9659258262890663)), mode=Mode.SUBTRACT)
    with BuildSketch(Plane(origin=(0.00635, 5.229086525, 4.010917846), x_dir=(0, 0.9659258262890656, -0.2588190451025303), z_dir=(1, 0, 0))) as fillet1_of_lpattern1_piece_4:
        with BuildLine():
            CenterArc((0.007378024, -0.530606), FILLET1_OF_LPATTERN1_R, 43.274584136, 46.725415864)
            Line((0.007378024, 0), (0.007378024, 0.01061212))
            Line((0.007378024, 0.01061212), (0.3937, 0.01061212))
            Line((0.3937, 0.01061212), (0.40431212, 0))
            ThreePointArc((0.40431212, 0), (0.40431212, -0.083439), (0.40142644, -0.15960344))
            Line((0.40142644, -0.15960344), (0.3937, -0.166878))
        make_face()
    revolve(axis=Axis((0.00635, 5.229086525, 4.010917846), (0, 0.2588190451025286, 0.9659258262890663)), mode=Mode.SUBTRACT)
    with BuildSketch(Plane(origin=(0.00635, 3.511670405, 4.471098109), x_dir=(0, 0.9659258262890659, -0.25881904510252973), z_dir=(1, 0, 0))) as fillet1_of_lpattern1_piece_5:
        with BuildLine():
            CenterArc((0.007378024, -0.530606), FILLET1_OF_LPATTERN1_R, 43.274584136, 46.725415864)
            Line((0.007378024, 0), (0.007378024, 0.01061212))
            Line((0.007378024, 0.01061212), (0.3937, 0.01061212))
            Line((0.3937, 0.01061212), (0.40431212, 0))
            ThreePointArc((0.40431212, 0), (0.40431212, -0.083439), (0.40142644, -0.15960344))
            Line((0.40142644, -0.15960344), (0.3937, -0.166878))
        make_face()
    revolve(axis=Axis((0.00635, 3.511670405, 4.471098109), (0, 0.2588190451025286, 0.9659258262890663)), mode=Mode.SUBTRACT)
    with BuildSketch(Plane(origin=(1.78435, 6.946502644, 3.550737584), x_dir=(0, 0.9659258262890662, -0.2588190451025287), z_dir=(1, 0, 0))) as fillet1_of_lpattern1_piece_6:
        with BuildLine():
            CenterArc((0.007378024, -0.530606), FILLET1_OF_LPATTERN1_R, 43.274584136, 46.725415864)
            Line((0.007378024, 0), (0.007378024, 0.01061212))
            Line((0.007378024, 0.01061212), (0.3937, 0.01061212))
            Line((0.3937, 0.01061212), (0.40431212, 0))
            ThreePointArc((0.40431212, 0), (0.40431212, -0.083439), (0.40142644, -0.15960344))
            Line((0.40142644, -0.15960344), (0.3937, -0.166878))
        make_face()
    revolve(axis=Axis((1.78435, 6.946502644, 3.550737584), (0, 0.2588190451025286, 0.9659258262890663)), mode=Mode.SUBTRACT)
    with BuildSketch(Plane(origin=(1.78435, 5.229086525, 4.010917846), x_dir=(0, 0.965925826289066, -0.2588190451025292), z_dir=(1, 0, 0))) as fillet1_of_lpattern1_piece_7:
        with BuildLine():
            CenterArc((0.007378024, -0.530606), FILLET1_OF_LPATTERN1_R, 43.274584136, 46.725415864)
            Line((0.007378024, 0), (0.007378024, 0.01061212))
            Line((0.007378024, 0.01061212), (0.3937, 0.01061212))
            Line((0.3937, 0.01061212), (0.40431212, 0))
            ThreePointArc((0.40431212, 0), (0.40431212, -0.083439), (0.40142644, -0.15960344))
            Line((0.40142644, -0.15960344), (0.3937, -0.166878))
        make_face()
    revolve(axis=Axis((1.78435, 5.229086525, 4.010917846), (0, 0.2588190451025286, 0.9659258262890663)), mode=Mode.SUBTRACT)
    with BuildSketch(Plane(origin=(1.78435, 3.511670405, 4.471098109), x_dir=(0, 0.9659258262890659, -0.25881904510252973), z_dir=(1, 0, 0))) as fillet1_of_lpattern1_piece_8:
        with BuildLine():
            CenterArc((0.007378024, -0.530606), FILLET1_OF_LPATTERN1_R, 43.274584136, 46.725415864)
            Line((0.007378024, 0), (0.007378024, 0.01061212))
            Line((0.007378024, 0.01061212), (0.3937, 0.01061212))
            Line((0.3937, 0.01061212), (0.40431212, 0))
            ThreePointArc((0.40431212, 0), (0.40431212, -0.083439), (0.40142644, -0.15960344))
            Line((0.40142644, -0.15960344), (0.3937, -0.166878))
        make_face()
    revolve(axis=Axis((1.78435, 3.511670405, 4.471098109), (0, 0.2588190451025286, 0.9659258262890663)), mode=Mode.SUBTRACT)

    # Fillet2 of LPattern1
    fillet2_of_lpattern1_edges = [part.edges().sort_by_distance(p)[0] for p in [
        (-1.77165, 4.805610322, 3.951623134),
        (-1.77165, 3.088194203, 4.411803397),
        (0.00635, 6.523026441, 3.491442872),
        (0.00635, 4.805610322, 3.951623134),
        (0.00635, 3.088194203, 4.411803397),
        (1.78435, 6.523026441, 3.491442872),
        (1.78435, 4.805610322, 3.951623134),
        (1.78435, 3.088194203, 4.411803397),
    ]]
    fillet(fillet2_of_lpattern1_edges, radius=FILLET2_OF_LPATTERN1_R)


solid = part.part
